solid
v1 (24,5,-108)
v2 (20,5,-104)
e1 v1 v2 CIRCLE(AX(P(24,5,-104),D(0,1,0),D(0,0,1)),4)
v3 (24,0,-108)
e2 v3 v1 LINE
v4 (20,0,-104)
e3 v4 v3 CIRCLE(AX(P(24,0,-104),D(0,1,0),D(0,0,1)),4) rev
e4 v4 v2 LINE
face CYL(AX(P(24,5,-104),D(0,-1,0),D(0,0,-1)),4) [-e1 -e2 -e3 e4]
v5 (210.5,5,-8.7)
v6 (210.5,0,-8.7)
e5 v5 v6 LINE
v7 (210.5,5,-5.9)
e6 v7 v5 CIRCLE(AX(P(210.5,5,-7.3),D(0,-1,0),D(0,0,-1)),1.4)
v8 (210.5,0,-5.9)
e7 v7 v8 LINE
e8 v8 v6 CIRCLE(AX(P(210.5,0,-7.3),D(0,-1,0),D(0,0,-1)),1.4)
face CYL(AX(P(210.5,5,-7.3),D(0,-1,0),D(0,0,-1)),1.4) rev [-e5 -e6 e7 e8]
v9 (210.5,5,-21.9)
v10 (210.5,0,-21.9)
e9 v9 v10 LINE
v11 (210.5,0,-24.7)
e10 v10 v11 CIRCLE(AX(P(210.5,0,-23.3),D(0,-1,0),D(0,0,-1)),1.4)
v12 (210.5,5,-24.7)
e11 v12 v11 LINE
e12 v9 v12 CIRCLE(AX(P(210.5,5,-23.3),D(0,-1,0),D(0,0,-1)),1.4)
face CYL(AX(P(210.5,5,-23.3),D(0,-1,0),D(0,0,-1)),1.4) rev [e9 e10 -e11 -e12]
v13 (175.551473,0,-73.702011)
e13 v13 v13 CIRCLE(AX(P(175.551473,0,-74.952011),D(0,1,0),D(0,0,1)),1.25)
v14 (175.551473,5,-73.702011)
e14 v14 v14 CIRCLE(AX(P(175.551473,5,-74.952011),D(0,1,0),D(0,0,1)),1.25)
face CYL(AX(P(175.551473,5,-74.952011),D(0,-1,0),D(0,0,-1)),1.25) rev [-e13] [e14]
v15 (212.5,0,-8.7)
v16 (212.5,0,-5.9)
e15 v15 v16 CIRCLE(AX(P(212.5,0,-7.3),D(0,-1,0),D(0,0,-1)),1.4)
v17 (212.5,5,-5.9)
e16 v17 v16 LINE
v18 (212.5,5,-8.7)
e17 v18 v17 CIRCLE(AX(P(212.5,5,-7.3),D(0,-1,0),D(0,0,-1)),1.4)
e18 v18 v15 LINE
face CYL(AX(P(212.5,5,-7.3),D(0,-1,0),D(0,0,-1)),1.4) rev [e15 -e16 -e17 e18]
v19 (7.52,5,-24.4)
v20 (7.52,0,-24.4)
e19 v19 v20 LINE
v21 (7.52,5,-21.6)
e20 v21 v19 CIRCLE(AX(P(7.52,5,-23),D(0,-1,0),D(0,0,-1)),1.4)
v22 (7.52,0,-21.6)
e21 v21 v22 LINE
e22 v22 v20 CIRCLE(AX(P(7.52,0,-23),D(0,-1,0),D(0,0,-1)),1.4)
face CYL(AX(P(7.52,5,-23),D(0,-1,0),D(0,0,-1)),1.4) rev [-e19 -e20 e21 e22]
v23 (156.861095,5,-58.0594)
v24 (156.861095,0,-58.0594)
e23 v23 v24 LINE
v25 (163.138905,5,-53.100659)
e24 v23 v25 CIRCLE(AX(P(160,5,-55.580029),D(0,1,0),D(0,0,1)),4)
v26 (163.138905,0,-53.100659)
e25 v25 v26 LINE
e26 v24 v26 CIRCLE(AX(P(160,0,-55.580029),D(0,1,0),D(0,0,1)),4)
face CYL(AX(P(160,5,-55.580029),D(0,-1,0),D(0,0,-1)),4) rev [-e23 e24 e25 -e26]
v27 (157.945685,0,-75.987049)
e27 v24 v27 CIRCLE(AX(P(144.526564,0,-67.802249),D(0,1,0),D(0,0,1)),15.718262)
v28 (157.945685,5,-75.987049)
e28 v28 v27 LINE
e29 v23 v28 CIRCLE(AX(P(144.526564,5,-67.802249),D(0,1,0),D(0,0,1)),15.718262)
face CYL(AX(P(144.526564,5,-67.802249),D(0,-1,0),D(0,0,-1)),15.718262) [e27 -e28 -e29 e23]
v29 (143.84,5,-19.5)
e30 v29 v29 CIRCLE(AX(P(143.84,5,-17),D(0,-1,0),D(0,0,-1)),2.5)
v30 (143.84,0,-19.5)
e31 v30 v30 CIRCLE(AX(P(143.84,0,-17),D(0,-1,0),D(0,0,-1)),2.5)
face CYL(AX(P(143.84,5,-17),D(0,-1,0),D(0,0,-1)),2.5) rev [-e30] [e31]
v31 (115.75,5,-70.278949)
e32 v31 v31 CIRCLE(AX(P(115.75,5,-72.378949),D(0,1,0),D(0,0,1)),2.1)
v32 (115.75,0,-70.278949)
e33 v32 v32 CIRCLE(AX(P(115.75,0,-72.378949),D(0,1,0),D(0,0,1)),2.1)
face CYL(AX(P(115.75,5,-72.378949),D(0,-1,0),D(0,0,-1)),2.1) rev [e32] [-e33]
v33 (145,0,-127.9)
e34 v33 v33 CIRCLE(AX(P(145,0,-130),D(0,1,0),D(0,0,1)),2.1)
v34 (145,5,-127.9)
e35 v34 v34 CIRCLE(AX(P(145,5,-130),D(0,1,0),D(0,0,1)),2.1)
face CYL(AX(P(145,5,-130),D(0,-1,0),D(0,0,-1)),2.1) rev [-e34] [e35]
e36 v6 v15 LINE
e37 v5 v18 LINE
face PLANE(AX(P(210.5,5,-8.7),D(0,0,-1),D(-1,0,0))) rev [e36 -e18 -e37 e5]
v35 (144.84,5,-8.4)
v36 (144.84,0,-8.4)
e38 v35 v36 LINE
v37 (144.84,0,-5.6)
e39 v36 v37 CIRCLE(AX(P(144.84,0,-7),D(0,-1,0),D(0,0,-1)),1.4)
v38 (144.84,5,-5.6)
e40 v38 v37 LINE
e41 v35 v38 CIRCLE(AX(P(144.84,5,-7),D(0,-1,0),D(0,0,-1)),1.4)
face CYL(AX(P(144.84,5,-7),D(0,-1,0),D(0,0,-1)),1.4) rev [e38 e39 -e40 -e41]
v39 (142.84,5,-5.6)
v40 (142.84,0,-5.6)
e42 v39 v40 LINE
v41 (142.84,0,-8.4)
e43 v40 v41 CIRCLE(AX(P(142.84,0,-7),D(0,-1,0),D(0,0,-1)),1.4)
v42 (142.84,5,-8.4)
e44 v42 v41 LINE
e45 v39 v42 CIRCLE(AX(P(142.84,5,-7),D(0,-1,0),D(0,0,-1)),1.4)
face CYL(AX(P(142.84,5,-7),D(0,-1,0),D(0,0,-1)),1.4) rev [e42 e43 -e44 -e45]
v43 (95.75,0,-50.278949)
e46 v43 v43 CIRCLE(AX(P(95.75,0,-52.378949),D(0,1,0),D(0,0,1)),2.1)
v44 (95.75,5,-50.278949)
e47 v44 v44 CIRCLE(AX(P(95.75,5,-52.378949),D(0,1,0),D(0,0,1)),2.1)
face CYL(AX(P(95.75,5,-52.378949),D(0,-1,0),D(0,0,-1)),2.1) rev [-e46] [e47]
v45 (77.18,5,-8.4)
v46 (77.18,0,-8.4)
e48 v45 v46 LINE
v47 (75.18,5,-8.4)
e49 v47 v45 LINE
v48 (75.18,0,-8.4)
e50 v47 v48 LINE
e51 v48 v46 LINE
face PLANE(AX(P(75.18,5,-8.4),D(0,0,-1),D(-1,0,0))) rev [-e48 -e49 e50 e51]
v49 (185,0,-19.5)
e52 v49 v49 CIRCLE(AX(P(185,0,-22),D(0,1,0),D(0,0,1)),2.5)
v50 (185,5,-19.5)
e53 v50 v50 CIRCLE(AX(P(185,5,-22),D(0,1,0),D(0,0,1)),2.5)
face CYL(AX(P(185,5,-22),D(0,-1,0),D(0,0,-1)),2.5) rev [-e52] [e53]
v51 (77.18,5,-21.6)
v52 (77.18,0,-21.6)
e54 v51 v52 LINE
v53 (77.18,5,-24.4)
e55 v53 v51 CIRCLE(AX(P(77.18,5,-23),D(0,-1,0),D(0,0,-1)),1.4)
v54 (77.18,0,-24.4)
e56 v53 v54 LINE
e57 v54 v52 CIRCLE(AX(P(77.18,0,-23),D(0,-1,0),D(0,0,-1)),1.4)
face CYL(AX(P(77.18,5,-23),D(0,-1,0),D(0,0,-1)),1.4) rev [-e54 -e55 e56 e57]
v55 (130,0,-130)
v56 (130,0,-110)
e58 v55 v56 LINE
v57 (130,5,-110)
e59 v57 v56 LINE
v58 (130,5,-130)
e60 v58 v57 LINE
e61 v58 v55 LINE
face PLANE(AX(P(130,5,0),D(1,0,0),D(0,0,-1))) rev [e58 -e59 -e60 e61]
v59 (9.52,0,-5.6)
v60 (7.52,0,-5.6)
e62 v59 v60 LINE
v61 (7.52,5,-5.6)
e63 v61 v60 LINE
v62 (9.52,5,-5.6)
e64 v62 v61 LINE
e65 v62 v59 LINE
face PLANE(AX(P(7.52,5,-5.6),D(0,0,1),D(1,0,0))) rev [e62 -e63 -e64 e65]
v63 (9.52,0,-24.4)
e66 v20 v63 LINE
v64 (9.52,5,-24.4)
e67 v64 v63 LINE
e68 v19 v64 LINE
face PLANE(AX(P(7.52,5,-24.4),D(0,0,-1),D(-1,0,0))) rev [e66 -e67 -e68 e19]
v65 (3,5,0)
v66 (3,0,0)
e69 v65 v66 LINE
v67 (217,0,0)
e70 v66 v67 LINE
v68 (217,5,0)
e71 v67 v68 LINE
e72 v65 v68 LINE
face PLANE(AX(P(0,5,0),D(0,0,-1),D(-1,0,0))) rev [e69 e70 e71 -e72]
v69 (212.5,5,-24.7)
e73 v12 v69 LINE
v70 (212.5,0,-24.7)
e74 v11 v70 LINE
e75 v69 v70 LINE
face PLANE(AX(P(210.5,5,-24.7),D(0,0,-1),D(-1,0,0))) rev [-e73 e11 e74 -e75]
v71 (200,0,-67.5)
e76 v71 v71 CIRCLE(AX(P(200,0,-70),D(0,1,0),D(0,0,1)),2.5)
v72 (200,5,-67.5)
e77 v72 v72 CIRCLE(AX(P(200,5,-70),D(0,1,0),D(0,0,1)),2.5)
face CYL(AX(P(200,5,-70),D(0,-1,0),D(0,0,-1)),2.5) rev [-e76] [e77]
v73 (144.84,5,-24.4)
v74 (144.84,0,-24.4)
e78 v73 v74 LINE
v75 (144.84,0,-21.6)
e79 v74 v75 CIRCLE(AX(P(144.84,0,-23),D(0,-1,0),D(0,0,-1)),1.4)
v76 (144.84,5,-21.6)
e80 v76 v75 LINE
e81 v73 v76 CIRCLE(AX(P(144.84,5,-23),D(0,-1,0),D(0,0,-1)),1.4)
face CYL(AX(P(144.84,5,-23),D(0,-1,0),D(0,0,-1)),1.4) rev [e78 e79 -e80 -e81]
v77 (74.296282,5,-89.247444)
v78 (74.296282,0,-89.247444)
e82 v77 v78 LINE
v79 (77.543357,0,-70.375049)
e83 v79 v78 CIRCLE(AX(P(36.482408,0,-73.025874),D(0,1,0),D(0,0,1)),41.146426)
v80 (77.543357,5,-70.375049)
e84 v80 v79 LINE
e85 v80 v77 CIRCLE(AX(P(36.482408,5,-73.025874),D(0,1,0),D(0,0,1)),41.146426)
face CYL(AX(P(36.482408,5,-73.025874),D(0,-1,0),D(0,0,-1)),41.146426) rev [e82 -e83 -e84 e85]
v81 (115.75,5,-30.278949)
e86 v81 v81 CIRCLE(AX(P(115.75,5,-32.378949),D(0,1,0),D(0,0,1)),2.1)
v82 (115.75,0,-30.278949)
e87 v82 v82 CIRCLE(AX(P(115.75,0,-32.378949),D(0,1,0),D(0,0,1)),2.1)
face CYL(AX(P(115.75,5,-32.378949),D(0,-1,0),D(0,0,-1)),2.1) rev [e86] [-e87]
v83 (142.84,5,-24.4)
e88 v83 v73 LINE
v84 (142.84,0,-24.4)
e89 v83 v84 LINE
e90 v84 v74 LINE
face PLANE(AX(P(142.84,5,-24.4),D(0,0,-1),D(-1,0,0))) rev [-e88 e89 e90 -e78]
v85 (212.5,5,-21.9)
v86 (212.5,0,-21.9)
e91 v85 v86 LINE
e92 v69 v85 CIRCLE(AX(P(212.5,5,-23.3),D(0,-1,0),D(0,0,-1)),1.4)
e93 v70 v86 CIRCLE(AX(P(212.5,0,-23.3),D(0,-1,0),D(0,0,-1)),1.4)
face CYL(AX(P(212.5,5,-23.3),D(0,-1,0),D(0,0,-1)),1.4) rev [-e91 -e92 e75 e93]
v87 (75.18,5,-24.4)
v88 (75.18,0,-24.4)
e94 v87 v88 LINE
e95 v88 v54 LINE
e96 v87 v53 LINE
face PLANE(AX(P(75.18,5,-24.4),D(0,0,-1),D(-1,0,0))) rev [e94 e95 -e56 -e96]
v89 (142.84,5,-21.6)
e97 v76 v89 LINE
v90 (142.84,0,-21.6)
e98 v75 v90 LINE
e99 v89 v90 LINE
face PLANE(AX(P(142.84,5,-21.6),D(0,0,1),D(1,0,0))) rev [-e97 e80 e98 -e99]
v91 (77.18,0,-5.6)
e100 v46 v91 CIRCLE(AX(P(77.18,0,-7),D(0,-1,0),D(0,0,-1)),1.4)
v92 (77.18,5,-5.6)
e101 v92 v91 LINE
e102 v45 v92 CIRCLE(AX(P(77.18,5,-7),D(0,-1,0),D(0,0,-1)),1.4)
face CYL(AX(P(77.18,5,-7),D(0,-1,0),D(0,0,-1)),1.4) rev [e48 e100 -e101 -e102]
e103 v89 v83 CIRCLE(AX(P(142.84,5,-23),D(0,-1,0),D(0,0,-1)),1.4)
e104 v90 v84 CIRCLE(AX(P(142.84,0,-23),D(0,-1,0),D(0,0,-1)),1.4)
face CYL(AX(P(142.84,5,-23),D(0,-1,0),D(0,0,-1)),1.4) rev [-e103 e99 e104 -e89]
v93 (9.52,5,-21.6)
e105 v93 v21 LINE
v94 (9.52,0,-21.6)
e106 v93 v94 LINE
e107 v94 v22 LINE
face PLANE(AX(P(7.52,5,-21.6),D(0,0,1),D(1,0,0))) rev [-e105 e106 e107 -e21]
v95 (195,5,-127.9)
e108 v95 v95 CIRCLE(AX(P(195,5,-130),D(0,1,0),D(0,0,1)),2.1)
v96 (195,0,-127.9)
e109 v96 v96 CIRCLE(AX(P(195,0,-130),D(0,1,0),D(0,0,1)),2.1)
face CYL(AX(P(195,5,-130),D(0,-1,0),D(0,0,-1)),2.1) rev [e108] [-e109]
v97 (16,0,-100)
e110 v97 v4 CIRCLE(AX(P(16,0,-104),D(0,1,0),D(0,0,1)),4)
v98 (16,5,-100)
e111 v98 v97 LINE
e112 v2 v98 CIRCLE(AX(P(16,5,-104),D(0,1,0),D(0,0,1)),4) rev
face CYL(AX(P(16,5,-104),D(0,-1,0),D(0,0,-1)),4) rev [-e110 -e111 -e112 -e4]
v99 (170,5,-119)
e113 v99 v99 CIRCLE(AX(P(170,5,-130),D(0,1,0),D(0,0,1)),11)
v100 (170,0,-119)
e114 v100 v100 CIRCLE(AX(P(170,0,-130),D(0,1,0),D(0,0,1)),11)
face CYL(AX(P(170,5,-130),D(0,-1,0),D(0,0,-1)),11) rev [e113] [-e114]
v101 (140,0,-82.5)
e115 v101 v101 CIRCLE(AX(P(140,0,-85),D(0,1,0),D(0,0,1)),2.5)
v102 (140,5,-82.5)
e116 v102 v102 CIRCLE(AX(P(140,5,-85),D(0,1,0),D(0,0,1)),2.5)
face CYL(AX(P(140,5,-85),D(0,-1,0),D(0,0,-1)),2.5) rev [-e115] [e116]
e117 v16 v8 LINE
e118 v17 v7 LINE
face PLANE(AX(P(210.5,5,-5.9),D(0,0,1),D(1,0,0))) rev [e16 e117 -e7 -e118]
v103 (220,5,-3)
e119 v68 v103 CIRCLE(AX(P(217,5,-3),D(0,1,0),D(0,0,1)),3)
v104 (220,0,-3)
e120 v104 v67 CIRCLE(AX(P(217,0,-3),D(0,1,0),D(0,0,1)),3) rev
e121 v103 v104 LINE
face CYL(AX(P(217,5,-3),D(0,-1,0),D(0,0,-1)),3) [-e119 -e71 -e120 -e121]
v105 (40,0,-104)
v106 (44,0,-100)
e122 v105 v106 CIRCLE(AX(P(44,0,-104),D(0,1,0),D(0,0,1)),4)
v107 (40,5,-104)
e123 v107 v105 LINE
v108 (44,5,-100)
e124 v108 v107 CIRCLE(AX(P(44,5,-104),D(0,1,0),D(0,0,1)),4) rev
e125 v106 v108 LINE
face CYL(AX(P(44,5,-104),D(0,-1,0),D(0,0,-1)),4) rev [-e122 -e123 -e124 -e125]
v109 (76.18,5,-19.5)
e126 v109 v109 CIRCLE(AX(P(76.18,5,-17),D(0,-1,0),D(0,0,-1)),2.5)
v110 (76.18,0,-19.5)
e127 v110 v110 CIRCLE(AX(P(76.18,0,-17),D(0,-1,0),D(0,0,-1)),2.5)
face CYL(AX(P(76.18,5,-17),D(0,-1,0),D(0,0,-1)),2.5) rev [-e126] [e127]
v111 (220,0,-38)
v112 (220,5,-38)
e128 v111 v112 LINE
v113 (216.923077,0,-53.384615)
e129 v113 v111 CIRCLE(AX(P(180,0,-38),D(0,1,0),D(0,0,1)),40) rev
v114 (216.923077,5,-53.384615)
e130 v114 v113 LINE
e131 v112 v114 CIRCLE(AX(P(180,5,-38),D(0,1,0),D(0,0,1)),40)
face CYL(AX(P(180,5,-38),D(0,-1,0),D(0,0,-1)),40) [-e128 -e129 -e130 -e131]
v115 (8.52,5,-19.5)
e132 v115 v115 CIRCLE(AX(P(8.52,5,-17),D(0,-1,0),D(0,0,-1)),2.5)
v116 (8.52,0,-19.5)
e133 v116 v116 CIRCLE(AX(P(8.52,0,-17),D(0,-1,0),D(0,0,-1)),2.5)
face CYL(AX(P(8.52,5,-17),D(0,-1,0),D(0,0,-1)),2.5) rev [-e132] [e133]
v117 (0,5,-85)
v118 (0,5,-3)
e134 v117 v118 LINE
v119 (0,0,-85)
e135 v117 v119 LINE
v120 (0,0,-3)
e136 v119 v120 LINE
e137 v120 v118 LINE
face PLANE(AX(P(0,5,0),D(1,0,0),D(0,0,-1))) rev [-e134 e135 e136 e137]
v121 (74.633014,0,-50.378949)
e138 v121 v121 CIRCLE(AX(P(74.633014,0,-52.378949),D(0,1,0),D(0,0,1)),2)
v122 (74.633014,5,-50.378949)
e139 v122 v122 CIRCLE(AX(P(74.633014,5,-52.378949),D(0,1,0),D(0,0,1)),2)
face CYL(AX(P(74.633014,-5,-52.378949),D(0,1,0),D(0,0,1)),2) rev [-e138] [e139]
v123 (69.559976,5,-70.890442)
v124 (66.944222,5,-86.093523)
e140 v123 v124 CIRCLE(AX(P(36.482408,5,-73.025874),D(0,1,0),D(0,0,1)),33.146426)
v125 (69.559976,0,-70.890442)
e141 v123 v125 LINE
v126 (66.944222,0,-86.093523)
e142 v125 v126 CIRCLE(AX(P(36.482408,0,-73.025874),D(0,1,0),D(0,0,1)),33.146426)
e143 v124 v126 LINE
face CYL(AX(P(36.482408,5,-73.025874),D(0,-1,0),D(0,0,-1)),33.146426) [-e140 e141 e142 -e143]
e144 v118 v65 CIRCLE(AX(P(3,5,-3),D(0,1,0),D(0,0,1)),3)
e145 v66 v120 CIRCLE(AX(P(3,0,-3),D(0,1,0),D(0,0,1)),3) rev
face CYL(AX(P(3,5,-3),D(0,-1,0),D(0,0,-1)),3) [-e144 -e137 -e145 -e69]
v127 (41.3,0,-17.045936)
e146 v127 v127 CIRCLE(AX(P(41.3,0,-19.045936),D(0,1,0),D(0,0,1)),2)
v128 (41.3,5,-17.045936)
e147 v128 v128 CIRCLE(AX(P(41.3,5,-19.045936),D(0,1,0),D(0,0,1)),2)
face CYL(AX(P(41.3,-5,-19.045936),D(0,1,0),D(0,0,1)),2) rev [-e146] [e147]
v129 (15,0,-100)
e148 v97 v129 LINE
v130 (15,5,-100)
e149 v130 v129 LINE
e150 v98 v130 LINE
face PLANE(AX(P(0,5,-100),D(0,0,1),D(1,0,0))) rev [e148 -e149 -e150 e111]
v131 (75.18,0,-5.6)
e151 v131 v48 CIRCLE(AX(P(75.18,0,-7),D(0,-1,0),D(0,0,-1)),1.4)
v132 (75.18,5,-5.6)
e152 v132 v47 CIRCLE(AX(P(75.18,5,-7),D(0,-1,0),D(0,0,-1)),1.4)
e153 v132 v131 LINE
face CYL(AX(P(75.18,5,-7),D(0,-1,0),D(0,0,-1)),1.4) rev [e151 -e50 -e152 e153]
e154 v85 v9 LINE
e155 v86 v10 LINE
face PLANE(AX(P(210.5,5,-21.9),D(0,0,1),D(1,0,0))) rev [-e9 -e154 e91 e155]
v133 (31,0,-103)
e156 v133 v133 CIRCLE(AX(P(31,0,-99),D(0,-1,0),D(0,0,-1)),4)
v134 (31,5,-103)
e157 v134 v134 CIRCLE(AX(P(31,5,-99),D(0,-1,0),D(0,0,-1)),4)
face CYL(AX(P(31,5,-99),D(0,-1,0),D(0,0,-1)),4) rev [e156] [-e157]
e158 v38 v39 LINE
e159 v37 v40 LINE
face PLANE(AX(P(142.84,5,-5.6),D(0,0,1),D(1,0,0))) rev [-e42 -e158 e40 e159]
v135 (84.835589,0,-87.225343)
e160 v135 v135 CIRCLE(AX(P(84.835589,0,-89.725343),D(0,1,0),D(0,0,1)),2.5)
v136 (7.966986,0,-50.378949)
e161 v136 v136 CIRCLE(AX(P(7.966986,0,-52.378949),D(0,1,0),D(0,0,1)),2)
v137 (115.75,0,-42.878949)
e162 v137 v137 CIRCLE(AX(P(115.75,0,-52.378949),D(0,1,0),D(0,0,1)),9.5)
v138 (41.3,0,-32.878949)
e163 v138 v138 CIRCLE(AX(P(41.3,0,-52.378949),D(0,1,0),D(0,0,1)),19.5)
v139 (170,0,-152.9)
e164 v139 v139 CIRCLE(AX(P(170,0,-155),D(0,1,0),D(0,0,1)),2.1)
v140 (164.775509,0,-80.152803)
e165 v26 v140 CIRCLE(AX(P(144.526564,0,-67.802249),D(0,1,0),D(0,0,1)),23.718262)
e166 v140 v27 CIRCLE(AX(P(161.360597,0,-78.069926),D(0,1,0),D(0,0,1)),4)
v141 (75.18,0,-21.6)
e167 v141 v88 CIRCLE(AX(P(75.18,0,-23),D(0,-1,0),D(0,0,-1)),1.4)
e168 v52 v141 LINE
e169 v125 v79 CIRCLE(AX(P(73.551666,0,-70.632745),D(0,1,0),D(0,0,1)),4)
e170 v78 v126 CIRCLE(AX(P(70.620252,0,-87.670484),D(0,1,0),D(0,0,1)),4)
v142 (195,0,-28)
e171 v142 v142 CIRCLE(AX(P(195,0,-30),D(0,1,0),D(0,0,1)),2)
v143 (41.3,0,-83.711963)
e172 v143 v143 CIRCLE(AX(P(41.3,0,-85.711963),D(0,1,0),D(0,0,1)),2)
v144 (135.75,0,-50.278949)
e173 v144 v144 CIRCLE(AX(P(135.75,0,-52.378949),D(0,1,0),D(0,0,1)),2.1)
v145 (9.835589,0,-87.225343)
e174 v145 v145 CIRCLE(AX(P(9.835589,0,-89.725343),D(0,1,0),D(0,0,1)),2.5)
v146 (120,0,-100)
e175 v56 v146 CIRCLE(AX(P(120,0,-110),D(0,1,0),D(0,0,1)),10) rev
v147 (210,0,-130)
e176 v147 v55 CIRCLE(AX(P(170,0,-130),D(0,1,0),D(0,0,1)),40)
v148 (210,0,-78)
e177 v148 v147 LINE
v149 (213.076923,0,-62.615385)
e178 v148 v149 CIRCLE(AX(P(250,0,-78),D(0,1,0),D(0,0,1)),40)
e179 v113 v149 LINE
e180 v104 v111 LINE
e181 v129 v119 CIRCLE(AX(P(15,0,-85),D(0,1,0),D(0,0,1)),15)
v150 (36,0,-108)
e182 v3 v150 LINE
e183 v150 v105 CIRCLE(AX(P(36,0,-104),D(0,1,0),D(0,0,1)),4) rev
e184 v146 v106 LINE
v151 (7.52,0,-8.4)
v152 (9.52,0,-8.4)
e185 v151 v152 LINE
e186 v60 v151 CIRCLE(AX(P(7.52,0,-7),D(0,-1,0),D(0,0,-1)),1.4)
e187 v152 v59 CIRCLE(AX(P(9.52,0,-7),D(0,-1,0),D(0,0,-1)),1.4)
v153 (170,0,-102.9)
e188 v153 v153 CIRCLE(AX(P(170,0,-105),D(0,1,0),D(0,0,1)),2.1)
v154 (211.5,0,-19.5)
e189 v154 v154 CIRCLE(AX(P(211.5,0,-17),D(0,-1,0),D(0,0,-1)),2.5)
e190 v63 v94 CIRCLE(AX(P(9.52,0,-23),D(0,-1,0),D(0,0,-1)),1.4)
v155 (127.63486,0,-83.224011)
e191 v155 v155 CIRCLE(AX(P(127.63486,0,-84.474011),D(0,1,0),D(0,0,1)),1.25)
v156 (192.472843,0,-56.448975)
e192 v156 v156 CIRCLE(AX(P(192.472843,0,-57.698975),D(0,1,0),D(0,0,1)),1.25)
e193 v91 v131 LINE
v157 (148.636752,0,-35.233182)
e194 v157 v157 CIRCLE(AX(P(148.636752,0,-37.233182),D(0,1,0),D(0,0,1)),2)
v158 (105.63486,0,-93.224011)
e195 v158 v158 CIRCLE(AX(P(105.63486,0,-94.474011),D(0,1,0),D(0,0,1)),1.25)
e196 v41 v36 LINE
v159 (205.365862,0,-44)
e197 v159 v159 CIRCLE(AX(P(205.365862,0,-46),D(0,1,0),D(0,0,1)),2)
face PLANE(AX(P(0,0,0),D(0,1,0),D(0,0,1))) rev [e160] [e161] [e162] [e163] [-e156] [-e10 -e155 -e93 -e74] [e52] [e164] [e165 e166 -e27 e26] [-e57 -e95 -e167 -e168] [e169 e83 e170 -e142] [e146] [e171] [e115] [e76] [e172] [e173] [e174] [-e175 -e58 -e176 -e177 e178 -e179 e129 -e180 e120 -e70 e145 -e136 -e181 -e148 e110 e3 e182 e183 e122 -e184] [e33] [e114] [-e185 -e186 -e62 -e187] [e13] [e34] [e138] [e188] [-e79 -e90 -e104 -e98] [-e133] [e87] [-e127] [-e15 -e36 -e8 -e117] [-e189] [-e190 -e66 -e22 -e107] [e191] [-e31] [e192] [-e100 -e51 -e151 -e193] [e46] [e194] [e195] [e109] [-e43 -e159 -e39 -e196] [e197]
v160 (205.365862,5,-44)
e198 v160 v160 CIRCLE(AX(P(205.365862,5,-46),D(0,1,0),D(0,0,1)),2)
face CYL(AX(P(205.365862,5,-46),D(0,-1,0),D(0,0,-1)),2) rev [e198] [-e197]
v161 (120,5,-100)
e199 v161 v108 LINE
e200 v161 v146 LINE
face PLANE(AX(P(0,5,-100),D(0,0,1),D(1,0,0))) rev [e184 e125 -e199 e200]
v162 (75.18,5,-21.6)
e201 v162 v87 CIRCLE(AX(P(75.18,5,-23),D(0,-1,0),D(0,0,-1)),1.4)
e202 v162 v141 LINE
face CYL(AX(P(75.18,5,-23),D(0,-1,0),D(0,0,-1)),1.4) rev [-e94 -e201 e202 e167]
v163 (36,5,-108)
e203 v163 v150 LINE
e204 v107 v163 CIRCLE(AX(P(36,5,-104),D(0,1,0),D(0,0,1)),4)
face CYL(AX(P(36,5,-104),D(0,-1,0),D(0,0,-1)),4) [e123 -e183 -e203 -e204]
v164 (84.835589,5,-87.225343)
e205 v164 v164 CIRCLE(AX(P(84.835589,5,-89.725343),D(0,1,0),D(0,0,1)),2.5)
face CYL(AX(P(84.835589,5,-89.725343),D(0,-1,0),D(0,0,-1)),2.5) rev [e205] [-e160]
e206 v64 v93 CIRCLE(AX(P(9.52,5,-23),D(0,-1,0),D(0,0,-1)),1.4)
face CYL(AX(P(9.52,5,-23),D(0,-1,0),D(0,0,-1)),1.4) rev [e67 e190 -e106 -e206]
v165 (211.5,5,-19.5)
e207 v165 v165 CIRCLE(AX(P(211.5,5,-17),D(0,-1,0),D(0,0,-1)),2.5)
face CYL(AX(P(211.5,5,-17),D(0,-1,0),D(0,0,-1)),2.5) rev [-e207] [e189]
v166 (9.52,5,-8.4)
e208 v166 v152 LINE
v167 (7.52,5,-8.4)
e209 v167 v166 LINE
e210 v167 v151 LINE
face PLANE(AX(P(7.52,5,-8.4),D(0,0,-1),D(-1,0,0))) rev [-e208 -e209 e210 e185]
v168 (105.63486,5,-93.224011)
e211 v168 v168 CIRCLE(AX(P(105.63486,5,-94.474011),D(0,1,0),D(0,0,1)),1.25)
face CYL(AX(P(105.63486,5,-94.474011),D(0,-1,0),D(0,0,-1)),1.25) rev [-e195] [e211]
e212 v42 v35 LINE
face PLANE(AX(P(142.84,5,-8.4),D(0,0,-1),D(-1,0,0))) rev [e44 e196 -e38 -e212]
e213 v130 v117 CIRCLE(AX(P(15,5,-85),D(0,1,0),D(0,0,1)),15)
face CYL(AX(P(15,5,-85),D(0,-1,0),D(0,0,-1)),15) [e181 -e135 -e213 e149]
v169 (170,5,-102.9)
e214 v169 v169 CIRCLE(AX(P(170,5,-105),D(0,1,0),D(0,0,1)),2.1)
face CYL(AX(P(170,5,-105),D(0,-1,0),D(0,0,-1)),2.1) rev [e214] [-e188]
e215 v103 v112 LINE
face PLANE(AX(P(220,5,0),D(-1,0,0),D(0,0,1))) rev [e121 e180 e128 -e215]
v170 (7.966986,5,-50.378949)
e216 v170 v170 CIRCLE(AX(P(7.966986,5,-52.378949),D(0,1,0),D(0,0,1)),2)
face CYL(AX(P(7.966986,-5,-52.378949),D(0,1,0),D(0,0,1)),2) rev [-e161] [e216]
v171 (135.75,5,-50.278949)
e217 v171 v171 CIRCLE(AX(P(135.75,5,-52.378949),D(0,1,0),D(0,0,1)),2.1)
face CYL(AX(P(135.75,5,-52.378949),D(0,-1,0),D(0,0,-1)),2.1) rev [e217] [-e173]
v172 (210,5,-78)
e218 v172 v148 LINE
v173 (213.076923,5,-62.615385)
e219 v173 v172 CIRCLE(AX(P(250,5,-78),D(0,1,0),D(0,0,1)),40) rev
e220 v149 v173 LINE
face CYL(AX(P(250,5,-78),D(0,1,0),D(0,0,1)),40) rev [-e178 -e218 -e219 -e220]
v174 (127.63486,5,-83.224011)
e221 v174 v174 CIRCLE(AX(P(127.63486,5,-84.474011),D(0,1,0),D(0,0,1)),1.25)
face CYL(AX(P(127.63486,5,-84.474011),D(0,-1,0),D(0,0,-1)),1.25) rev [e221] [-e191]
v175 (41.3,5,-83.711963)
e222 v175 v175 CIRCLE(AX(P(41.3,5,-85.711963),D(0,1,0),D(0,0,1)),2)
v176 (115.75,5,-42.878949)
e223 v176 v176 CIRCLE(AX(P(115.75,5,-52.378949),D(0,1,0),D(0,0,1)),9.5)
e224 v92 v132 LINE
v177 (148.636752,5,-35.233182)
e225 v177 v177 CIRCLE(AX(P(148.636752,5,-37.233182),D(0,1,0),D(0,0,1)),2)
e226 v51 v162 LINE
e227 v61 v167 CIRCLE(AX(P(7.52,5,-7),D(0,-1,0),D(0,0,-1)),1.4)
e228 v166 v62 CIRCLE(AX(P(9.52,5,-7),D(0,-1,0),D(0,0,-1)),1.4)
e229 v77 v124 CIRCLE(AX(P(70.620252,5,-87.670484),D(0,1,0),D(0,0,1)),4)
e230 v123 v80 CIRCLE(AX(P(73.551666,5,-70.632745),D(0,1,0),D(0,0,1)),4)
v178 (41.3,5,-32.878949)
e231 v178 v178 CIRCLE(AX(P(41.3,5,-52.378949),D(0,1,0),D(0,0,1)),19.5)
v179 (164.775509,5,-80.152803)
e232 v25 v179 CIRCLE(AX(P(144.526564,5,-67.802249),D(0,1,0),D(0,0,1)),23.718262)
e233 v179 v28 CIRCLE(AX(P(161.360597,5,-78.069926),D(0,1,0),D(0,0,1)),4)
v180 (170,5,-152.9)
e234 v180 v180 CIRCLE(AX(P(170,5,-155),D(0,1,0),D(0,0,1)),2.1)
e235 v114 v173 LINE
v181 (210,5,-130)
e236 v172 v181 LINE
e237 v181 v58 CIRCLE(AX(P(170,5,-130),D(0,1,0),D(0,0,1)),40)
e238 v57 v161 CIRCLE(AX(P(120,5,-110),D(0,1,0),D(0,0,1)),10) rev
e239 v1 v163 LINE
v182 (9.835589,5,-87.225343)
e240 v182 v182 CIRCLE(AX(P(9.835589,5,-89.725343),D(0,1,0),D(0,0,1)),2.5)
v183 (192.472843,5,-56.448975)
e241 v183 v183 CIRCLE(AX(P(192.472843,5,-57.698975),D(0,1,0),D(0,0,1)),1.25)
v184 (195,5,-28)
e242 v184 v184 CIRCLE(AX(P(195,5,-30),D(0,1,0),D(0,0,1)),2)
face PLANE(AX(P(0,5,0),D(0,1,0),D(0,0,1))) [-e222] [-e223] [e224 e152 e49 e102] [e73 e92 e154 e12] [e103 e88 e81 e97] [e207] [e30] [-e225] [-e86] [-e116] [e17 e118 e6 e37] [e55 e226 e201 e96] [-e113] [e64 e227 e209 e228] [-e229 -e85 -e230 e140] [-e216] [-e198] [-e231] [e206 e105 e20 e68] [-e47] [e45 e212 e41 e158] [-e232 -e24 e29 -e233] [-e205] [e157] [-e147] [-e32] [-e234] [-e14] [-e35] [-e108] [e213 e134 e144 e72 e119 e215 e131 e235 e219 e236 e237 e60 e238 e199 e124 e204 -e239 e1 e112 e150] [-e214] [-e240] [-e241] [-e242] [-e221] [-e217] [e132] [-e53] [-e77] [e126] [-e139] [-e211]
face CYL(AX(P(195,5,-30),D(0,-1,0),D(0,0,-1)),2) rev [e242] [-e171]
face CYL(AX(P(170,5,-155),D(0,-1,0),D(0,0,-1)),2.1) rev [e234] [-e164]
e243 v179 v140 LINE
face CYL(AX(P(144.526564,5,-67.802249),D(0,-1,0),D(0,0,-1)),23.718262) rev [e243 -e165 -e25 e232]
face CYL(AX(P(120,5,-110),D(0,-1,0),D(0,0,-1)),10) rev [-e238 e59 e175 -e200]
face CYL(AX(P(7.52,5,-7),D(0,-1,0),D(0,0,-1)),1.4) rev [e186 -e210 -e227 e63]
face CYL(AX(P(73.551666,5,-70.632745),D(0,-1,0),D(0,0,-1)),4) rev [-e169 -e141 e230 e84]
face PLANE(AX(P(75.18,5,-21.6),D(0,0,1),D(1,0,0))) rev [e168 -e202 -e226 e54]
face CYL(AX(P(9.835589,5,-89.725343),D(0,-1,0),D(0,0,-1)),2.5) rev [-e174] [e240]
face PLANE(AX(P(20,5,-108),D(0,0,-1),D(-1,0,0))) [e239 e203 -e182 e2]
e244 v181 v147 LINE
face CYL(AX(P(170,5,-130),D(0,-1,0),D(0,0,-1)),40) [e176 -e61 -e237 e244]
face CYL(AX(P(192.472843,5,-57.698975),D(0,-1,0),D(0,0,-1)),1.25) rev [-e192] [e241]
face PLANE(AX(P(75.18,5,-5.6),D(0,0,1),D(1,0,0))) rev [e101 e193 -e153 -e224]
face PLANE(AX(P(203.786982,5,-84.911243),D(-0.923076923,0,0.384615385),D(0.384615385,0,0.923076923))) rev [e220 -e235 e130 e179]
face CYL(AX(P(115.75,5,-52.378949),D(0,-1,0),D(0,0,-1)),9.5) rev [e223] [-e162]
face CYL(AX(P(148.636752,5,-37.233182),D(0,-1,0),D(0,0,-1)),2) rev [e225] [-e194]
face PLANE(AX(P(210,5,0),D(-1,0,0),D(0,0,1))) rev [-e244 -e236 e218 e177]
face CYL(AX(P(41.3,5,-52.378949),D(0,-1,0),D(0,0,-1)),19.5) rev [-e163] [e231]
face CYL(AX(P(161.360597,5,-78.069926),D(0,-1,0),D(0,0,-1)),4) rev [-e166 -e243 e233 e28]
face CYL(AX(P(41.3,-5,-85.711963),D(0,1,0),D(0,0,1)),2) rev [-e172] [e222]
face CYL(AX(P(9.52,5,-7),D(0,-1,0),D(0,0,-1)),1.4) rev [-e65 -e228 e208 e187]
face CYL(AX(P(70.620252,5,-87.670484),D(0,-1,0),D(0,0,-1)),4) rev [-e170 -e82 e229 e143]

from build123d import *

# Parameters (mm, degrees)
SKETCH1_R           = 19.5
SKETCH1_R_2         = 2.1
SKETCH1_R_3         = 2
SKETCH1_R_4         = 2.5
SKETCH1_R_5         = 9.5
SKETCH1_R_6         = 1.25
SKETCH1_R_7         = 11
BOSS_EXTRUDE1_DEPTH = 5
SKETCH15_R          = 2
CUT_EXTRUDE14_DEPTH = 10
SKETCH18_R          = 2.5
CUT_EXTRUDE15_DEPTH = 483.844656179
FILLET2_R           = 40
FILLET3_R           = 40
SKETCH21_W          = 20
SKETCH21_H          = 8
BOSS_EXTRUDE3_DEPTH = 5
SKETCH20_R          = 4
CUT_EXTRUDE17_DEPTH = 279.07373123
FILLET4_R           = 4
FILLET5_R           = 3


with BuildPart() as part:
    # Sketch1 → Boss-Extrude1 (new body)
    with BuildSketch(Plane(origin=(0, 0, 0), x_dir=(1, 0, 0), z_dir=(0, 1, 0))):
        with BuildLine():
            Line((0, 85), (0, 0))
            Line((0, 0), (220, 0))
            Line((220, 0), (220, 46))
            Line((220, 46), (210, 70))
            Line((210, 70), (210, 130))
            ThreePointArc((210, 130), (170, 170), (130, 130))
            Line((130, 130), (130, 110))
            ThreePointArc((130, 110), (127.071067812, 102.928932188), (120, 100))
            Line((120, 100), (15, 100))
            ThreePointArc((15, 100), (4.393398282, 95.606601718), (0, 85))
        make_face()
        with Locations(Location((41.3, 52.378949376, 0), (0, 0, 270))):
            Circle(SKETCH1_R, mode=Mode.SUBTRACT)
        with Locations(Location((95.75, 52.378949376, 0), (0, 0, 270))):
            Circle(SKETCH1_R_2, mode=Mode.SUBTRACT)
        with BuildLine():
            ThreePointArc((74.29628188, 89.247443853), (77.033008956, 80.00277522), (77.543356768, 70.375048681))
            ThreePointArc((77.543356768, 70.375048681), (73.293969575, 66.641055044), (69.559975938, 70.890442238))
            ThreePointArc((69.559975938, 70.890442238), (69.148853816, 78.646273201), (66.944221964, 86.093523278))
            ThreePointArc((66.944221964, 86.093523278), (69.043291634, 91.346513523), (74.29628188, 89.247443853))
        make_face(mode=Mode.SUBTRACT)
        with Locations(Location((115.75, 32.378949376, 0), (0, 0, 270))):
            Circle(SKETCH1_R_2, mode=Mode.SUBTRACT)
        with Locations(Location((148.636752457, 37.233182234, 0), (0, 0, 270))):
            Circle(SKETCH1_R_3, mode=Mode.SUBTRACT)
        with Locations(Location((185, 22, 0), (0, 0, 270))):
            Circle(SKETCH1_R_4, mode=Mode.SUBTRACT)
        with Locations(Location((195, 30, 0), (0, 0, 270))):
            Circle(SKETCH1_R_3, mode=Mode.SUBTRACT)
        with Locations(Location((115.75, 52.378949376, 0), (0, 0, 270))):
            Circle(SKETCH1_R_5, mode=Mode.SUBTRACT)
        with Locations(Location((135.75, 52.378949376, 0), (0, 0, 270))):
            Circle(SKETCH1_R_2, mode=Mode.SUBTRACT)
        with Locations(Location((115.75, 72.378949376, 0), (0, 0, 270))):
            Circle(SKETCH1_R_2, mode=Mode.SUBTRACT)
        with Locations(Location((127.63485968, 84.474011316, 0), (0, 0, 270))):
            Circle(SKETCH1_R_6, mode=Mode.SUBTRACT)
        with BuildLine():
            ThreePointArc((164.775508993, 80.152802956), (168.201540304, 66.369956658), (163.138904602, 53.100658923))
            ThreePointArc((163.138904602, 53.100658923), (157.520629535, 52.441124786), (156.861095398, 58.059399852))
            ThreePointArc((156.861095398, 58.059399852), (160.216140339, 66.853058501), (157.94568485, 75.987049461))
            ThreePointArc((157.94568485, 75.987049461), (159.277720174, 81.48483828), (164.775508993, 80.152802956))
        make_face(mode=Mode.SUBTRACT)
        with Locations(Location((140, 85, 0), (0, 0, 270))):
            Circle(SKETCH1_R_4, mode=Mode.SUBTRACT)
        with Locations(Location((192.472842847, 57.698975127, 0), (0, 0, 270))):
            Circle(SKETCH1_R_6, mode=Mode.SUBTRACT)
        with Locations(Location((205.365861758, 46, 0), (0, 0, 270))):
            Circle(SKETCH1_R_3, mode=Mode.SUBTRACT)
        with Locations(Location((175.551473485, 74.952011351, 0), (0, 0, 270))):
            Circle(SKETCH1_R_6, mode=Mode.SUBTRACT)
        with Locations(Location((200, 70, 0), (0, 0, 270))):
            Circle(SKETCH1_R_4, mode=Mode.SUBTRACT)
        with Locations(Location((9.83558927, 89.725342507, 0), (0, 0, 270))):
            Circle(SKETCH1_R_4, mode=Mode.SUBTRACT)
        with Locations(Location((84.83558927, 89.725342507, 0), (0, 0, 270))):
            Circle(SKETCH1_R_4, mode=Mode.SUBTRACT)
        with Locations(Location((105.63485968, 94.474011316, 0), (0, 0, 270))):
            Circle(SKETCH1_R_6, mode=Mode.SUBTRACT)
        with Locations(Location((170, 105, 0), (0, 0, 270))):
            Circle(SKETCH1_R_2, mode=Mode.SUBTRACT)
        with Locations(Location((145, 130, 0), (0, 0, 270))):
            Circle(SKETCH1_R_2, mode=Mode.SUBTRACT)
        with Locations(Location((170, 130, 0), (0, 0, 270))):
            Circle(SKETCH1_R_7, mode=Mode.SUBTRACT)
        with Locations(Location((195, 130, 0), (0, 0, 270))):
            Circle(SKETCH1_R_2, mode=Mode.SUBTRACT)
        with Locations(Location((170, 155, 0), (0, 0, 270))):
            Circle(SKETCH1_R_2, mode=Mode.SUBTRACT)
    extrude(amount=BOSS_EXTRUDE1_DEPTH)

    # Sketch15 → Cut-Extrude14 (cut)
    with BuildSketch(Plane(origin=(0, 5, 0), x_dir=(1, 0, 0), z_dir=(0, 1, 0))):
        with Locations(Location((41.3, 85.711963041, 0), (0, 0, 270))):
            Circle(SKETCH15_R)
        with Locations(Location((74.633013665, 52.378949376, 0), (0, 0, 270))):
            Circle(SKETCH15_R)
        with Locations(Location((41.3, 19.045935711, 0), (0, 0, 270))):
            Circle(SKETCH15_R)
        with Locations(Location((7.966986335, 52.378949376, 0), (0, 0, 270))):
            Circle(SKETCH15_R)
    extrude(amount=-CUT_EXTRUDE14_DEPTH, mode=Mode.SUBTRACT)

    # Sketch18 → Cut-Extrude15 (cut, through all)
    with BuildSketch(Plane(origin=(300.638016231, 0, 207.797227621), x_dir=(-1, 0, 0), z_dir=(0, -1, 0))):
        with Locations(Location((292.118016257, 224.797227621, 0), (0, 0, 90))):
            Circle(SKETCH18_R)
        with Locations(Location((224.458016257, 224.797227621, 0), (0, 0, 90))):
            Circle(SKETCH18_R)
        with Locations(Location((156.798016257, 224.797227621, 0), (0, 0, 90))):
            Circle(SKETCH18_R)
        with Locations(Location((89.138016257, 224.797227621, 0), (0, 0, 90))):
            Circle(SKETCH18_R)
        with BuildLine():
            Line((293.118016257, 229.397227621), (291.118016257, 229.397227621))
            ThreePointArc((291.118016257, 229.397227621), (289.718016257, 230.797227621), (291.118016257, 232.197227621))
            Line((291.118016257, 232.197227621), (293.118016257, 232.197227621))
            ThreePointArc((293.118016257, 232.197227621), (294.518016257, 230.797227621), (293.118016257, 229.397227621))
        make_face()
        with BuildLine():
            Line((293.118016257, 213.397227621), (291.118016257, 213.397227621))
            ThreePointArc((291.118016257, 213.397227621), (289.718016257, 214.797227621), (291.118016257, 216.197227621))
            Line((291.118016257, 216.197227621), (293.118016257, 216.197227621))
            ThreePointArc((293.118016257, 216.197227621), (294.518016257, 214.797227621), (293.118016257, 213.397227621))
        make_face()
        with BuildLine():
            Line((225.458016257, 229.397227621), (223.458016257, 229.397227621))
            ThreePointArc((223.458016257, 229.397227621), (222.058016257, 230.797227621), (223.458016257, 232.197227621))
            Line((223.458016257, 232.197227621), (225.458016257, 232.197227621))
            ThreePointArc((225.458016257, 232.197227621), (226.858016257, 230.797227621), (225.458016257, 229.397227621))
        make_face()
        with BuildLine():
            Line((225.458016257, 213.397227621), (223.458016257, 213.397227621))
            ThreePointArc((223.458016257, 213.397227621), (222.058016257, 214.797227621), (223.458016257, 216.197227621))
            Line((223.458016257, 216.197227621), (225.458016257, 216.197227621))
            ThreePointArc((225.458016257, 216.197227621), (226.858016257, 214.797227621), (225.458016257, 213.397227621))
        make_face()
        with BuildLine():
            Line((157.798016257, 229.397227621), (155.798016257, 229.397227621))
            ThreePointArc((155.798016257, 229.397227621), (154.398016257, 230.797227621), (155.798016257, 232.197227621))
            Line((155.798016257, 232.197227621), (157.798016257, 232.197227621))
            ThreePointArc((157.798016257, 232.197227621), (159.198016257, 230.797227621), (157.798016257, 229.397227621))
        make_face()
        with BuildLine():
            Line((157.798016257, 213.397227621), (155.798016257, 213.397227621))
            ThreePointArc((155.798016257, 213.397227621), (154.398016257, 214.797227621), (155.798016257, 216.197227621))
            Line((155.798016257, 216.197227621), (157.798016257, 216.197227621))
            ThreePointArc((157.798016257, 216.197227621), (159.198016257, 214.797227621), (157.798016257, 213.397227621))
        make_face()
        with BuildLine():
            Line((90.138016257, 229.697227621), (88.138016257, 229.697227621))
            ThreePointArc((88.138016257, 229.697227621), (86.738016257, 231.097227621), (88.138016257, 232.497227621))
            Line((88.138016257, 232.497227621), (90.138016257, 232.497227621))
            ThreePointArc((90.138016257, 232.497227621), (91.538016257, 231.097227621), (90.138016257, 229.697227621))
        make_face()
        with BuildLine():
            Line((90.138016257, 213.697227621), (88.138016257, 213.697227621))
            ThreePointArc((88.138016257, 213.697227621), (86.738016257, 215.097227621), (88.138016257, 216.497227621))
            Line((88.138016257, 216.497227621), (90.138016257, 216.497227621))
            ThreePointArc((90.138016257, 216.497227621), (91.538016257, 215.097227621), (90.138016257, 213.697227621))
        make_face()
    extrude(amount=-CUT_EXTRUDE15_DEPTH, mode=Mode.SUBTRACT)

    # Fillet2
    fillet2_edges = [part.edges().sort_by_distance(p)[0] for p in [
        (210, 2.5, -70),
    ]]
    fillet(fillet2_edges, radius=FILLET2_R)

    # Fillet3
    fillet3_edges = [part.edges().sort_by_distance(p)[0] for p in [
        (220, 2.5, -46),
    ]]
    fillet(fillet3_edges, radius=FILLET3_R)

    # Sketch21 → Boss-Extrude3 (add)
    with BuildSketch(Plane.XZ):
        with Locations((30, -104)):
            Rectangle(SKETCH21_W, SKETCH21_H)
    extrude(amount=-BOSS_EXTRUDE3_DEPTH)

    # Sketch20 → Cut-Extrude17 (cut, through all)
    with BuildSketch(Plane(origin=(0, 0, 0), x_dir=(-1, 0, 0), z_dir=(0, -1, 0))):
        with Locations(Location((-31, 99, 0), (0, 0, 90))):
            Circle(SKETCH20_R)
    extrude(amount=-CUT_EXTRUDE17_DEPTH, mode=Mode.SUBTRACT)

    # Fillet4
    fillet4_edges = [part.edges().sort_by_distance(p)[0] for p in [
        (40, 2.5, -100),
        (20, 2.5, -100),
    ]]
    fillet(fillet4_edges, radius=FILLET4_R)
    fillet4_2_edges = [part.edges().sort_by_distance(p)[0] for p in [
        (40, 2.5, -108),
        (20, 2.5, -108),
    ]]
    fillet(fillet4_2_edges, radius=FILLET4_R - 0.0001)  # a hair under: the kernel refuses the full size

    # Fillet5
    fillet5_edges = [part.edges().sort_by_distance(p)[0] for p in [
        (220, 2.5, 0),
        (0, 2.5, 0),
    ]]
    fillet(fillet5_edges, radius=FILLET5_R)


solid = part.part
